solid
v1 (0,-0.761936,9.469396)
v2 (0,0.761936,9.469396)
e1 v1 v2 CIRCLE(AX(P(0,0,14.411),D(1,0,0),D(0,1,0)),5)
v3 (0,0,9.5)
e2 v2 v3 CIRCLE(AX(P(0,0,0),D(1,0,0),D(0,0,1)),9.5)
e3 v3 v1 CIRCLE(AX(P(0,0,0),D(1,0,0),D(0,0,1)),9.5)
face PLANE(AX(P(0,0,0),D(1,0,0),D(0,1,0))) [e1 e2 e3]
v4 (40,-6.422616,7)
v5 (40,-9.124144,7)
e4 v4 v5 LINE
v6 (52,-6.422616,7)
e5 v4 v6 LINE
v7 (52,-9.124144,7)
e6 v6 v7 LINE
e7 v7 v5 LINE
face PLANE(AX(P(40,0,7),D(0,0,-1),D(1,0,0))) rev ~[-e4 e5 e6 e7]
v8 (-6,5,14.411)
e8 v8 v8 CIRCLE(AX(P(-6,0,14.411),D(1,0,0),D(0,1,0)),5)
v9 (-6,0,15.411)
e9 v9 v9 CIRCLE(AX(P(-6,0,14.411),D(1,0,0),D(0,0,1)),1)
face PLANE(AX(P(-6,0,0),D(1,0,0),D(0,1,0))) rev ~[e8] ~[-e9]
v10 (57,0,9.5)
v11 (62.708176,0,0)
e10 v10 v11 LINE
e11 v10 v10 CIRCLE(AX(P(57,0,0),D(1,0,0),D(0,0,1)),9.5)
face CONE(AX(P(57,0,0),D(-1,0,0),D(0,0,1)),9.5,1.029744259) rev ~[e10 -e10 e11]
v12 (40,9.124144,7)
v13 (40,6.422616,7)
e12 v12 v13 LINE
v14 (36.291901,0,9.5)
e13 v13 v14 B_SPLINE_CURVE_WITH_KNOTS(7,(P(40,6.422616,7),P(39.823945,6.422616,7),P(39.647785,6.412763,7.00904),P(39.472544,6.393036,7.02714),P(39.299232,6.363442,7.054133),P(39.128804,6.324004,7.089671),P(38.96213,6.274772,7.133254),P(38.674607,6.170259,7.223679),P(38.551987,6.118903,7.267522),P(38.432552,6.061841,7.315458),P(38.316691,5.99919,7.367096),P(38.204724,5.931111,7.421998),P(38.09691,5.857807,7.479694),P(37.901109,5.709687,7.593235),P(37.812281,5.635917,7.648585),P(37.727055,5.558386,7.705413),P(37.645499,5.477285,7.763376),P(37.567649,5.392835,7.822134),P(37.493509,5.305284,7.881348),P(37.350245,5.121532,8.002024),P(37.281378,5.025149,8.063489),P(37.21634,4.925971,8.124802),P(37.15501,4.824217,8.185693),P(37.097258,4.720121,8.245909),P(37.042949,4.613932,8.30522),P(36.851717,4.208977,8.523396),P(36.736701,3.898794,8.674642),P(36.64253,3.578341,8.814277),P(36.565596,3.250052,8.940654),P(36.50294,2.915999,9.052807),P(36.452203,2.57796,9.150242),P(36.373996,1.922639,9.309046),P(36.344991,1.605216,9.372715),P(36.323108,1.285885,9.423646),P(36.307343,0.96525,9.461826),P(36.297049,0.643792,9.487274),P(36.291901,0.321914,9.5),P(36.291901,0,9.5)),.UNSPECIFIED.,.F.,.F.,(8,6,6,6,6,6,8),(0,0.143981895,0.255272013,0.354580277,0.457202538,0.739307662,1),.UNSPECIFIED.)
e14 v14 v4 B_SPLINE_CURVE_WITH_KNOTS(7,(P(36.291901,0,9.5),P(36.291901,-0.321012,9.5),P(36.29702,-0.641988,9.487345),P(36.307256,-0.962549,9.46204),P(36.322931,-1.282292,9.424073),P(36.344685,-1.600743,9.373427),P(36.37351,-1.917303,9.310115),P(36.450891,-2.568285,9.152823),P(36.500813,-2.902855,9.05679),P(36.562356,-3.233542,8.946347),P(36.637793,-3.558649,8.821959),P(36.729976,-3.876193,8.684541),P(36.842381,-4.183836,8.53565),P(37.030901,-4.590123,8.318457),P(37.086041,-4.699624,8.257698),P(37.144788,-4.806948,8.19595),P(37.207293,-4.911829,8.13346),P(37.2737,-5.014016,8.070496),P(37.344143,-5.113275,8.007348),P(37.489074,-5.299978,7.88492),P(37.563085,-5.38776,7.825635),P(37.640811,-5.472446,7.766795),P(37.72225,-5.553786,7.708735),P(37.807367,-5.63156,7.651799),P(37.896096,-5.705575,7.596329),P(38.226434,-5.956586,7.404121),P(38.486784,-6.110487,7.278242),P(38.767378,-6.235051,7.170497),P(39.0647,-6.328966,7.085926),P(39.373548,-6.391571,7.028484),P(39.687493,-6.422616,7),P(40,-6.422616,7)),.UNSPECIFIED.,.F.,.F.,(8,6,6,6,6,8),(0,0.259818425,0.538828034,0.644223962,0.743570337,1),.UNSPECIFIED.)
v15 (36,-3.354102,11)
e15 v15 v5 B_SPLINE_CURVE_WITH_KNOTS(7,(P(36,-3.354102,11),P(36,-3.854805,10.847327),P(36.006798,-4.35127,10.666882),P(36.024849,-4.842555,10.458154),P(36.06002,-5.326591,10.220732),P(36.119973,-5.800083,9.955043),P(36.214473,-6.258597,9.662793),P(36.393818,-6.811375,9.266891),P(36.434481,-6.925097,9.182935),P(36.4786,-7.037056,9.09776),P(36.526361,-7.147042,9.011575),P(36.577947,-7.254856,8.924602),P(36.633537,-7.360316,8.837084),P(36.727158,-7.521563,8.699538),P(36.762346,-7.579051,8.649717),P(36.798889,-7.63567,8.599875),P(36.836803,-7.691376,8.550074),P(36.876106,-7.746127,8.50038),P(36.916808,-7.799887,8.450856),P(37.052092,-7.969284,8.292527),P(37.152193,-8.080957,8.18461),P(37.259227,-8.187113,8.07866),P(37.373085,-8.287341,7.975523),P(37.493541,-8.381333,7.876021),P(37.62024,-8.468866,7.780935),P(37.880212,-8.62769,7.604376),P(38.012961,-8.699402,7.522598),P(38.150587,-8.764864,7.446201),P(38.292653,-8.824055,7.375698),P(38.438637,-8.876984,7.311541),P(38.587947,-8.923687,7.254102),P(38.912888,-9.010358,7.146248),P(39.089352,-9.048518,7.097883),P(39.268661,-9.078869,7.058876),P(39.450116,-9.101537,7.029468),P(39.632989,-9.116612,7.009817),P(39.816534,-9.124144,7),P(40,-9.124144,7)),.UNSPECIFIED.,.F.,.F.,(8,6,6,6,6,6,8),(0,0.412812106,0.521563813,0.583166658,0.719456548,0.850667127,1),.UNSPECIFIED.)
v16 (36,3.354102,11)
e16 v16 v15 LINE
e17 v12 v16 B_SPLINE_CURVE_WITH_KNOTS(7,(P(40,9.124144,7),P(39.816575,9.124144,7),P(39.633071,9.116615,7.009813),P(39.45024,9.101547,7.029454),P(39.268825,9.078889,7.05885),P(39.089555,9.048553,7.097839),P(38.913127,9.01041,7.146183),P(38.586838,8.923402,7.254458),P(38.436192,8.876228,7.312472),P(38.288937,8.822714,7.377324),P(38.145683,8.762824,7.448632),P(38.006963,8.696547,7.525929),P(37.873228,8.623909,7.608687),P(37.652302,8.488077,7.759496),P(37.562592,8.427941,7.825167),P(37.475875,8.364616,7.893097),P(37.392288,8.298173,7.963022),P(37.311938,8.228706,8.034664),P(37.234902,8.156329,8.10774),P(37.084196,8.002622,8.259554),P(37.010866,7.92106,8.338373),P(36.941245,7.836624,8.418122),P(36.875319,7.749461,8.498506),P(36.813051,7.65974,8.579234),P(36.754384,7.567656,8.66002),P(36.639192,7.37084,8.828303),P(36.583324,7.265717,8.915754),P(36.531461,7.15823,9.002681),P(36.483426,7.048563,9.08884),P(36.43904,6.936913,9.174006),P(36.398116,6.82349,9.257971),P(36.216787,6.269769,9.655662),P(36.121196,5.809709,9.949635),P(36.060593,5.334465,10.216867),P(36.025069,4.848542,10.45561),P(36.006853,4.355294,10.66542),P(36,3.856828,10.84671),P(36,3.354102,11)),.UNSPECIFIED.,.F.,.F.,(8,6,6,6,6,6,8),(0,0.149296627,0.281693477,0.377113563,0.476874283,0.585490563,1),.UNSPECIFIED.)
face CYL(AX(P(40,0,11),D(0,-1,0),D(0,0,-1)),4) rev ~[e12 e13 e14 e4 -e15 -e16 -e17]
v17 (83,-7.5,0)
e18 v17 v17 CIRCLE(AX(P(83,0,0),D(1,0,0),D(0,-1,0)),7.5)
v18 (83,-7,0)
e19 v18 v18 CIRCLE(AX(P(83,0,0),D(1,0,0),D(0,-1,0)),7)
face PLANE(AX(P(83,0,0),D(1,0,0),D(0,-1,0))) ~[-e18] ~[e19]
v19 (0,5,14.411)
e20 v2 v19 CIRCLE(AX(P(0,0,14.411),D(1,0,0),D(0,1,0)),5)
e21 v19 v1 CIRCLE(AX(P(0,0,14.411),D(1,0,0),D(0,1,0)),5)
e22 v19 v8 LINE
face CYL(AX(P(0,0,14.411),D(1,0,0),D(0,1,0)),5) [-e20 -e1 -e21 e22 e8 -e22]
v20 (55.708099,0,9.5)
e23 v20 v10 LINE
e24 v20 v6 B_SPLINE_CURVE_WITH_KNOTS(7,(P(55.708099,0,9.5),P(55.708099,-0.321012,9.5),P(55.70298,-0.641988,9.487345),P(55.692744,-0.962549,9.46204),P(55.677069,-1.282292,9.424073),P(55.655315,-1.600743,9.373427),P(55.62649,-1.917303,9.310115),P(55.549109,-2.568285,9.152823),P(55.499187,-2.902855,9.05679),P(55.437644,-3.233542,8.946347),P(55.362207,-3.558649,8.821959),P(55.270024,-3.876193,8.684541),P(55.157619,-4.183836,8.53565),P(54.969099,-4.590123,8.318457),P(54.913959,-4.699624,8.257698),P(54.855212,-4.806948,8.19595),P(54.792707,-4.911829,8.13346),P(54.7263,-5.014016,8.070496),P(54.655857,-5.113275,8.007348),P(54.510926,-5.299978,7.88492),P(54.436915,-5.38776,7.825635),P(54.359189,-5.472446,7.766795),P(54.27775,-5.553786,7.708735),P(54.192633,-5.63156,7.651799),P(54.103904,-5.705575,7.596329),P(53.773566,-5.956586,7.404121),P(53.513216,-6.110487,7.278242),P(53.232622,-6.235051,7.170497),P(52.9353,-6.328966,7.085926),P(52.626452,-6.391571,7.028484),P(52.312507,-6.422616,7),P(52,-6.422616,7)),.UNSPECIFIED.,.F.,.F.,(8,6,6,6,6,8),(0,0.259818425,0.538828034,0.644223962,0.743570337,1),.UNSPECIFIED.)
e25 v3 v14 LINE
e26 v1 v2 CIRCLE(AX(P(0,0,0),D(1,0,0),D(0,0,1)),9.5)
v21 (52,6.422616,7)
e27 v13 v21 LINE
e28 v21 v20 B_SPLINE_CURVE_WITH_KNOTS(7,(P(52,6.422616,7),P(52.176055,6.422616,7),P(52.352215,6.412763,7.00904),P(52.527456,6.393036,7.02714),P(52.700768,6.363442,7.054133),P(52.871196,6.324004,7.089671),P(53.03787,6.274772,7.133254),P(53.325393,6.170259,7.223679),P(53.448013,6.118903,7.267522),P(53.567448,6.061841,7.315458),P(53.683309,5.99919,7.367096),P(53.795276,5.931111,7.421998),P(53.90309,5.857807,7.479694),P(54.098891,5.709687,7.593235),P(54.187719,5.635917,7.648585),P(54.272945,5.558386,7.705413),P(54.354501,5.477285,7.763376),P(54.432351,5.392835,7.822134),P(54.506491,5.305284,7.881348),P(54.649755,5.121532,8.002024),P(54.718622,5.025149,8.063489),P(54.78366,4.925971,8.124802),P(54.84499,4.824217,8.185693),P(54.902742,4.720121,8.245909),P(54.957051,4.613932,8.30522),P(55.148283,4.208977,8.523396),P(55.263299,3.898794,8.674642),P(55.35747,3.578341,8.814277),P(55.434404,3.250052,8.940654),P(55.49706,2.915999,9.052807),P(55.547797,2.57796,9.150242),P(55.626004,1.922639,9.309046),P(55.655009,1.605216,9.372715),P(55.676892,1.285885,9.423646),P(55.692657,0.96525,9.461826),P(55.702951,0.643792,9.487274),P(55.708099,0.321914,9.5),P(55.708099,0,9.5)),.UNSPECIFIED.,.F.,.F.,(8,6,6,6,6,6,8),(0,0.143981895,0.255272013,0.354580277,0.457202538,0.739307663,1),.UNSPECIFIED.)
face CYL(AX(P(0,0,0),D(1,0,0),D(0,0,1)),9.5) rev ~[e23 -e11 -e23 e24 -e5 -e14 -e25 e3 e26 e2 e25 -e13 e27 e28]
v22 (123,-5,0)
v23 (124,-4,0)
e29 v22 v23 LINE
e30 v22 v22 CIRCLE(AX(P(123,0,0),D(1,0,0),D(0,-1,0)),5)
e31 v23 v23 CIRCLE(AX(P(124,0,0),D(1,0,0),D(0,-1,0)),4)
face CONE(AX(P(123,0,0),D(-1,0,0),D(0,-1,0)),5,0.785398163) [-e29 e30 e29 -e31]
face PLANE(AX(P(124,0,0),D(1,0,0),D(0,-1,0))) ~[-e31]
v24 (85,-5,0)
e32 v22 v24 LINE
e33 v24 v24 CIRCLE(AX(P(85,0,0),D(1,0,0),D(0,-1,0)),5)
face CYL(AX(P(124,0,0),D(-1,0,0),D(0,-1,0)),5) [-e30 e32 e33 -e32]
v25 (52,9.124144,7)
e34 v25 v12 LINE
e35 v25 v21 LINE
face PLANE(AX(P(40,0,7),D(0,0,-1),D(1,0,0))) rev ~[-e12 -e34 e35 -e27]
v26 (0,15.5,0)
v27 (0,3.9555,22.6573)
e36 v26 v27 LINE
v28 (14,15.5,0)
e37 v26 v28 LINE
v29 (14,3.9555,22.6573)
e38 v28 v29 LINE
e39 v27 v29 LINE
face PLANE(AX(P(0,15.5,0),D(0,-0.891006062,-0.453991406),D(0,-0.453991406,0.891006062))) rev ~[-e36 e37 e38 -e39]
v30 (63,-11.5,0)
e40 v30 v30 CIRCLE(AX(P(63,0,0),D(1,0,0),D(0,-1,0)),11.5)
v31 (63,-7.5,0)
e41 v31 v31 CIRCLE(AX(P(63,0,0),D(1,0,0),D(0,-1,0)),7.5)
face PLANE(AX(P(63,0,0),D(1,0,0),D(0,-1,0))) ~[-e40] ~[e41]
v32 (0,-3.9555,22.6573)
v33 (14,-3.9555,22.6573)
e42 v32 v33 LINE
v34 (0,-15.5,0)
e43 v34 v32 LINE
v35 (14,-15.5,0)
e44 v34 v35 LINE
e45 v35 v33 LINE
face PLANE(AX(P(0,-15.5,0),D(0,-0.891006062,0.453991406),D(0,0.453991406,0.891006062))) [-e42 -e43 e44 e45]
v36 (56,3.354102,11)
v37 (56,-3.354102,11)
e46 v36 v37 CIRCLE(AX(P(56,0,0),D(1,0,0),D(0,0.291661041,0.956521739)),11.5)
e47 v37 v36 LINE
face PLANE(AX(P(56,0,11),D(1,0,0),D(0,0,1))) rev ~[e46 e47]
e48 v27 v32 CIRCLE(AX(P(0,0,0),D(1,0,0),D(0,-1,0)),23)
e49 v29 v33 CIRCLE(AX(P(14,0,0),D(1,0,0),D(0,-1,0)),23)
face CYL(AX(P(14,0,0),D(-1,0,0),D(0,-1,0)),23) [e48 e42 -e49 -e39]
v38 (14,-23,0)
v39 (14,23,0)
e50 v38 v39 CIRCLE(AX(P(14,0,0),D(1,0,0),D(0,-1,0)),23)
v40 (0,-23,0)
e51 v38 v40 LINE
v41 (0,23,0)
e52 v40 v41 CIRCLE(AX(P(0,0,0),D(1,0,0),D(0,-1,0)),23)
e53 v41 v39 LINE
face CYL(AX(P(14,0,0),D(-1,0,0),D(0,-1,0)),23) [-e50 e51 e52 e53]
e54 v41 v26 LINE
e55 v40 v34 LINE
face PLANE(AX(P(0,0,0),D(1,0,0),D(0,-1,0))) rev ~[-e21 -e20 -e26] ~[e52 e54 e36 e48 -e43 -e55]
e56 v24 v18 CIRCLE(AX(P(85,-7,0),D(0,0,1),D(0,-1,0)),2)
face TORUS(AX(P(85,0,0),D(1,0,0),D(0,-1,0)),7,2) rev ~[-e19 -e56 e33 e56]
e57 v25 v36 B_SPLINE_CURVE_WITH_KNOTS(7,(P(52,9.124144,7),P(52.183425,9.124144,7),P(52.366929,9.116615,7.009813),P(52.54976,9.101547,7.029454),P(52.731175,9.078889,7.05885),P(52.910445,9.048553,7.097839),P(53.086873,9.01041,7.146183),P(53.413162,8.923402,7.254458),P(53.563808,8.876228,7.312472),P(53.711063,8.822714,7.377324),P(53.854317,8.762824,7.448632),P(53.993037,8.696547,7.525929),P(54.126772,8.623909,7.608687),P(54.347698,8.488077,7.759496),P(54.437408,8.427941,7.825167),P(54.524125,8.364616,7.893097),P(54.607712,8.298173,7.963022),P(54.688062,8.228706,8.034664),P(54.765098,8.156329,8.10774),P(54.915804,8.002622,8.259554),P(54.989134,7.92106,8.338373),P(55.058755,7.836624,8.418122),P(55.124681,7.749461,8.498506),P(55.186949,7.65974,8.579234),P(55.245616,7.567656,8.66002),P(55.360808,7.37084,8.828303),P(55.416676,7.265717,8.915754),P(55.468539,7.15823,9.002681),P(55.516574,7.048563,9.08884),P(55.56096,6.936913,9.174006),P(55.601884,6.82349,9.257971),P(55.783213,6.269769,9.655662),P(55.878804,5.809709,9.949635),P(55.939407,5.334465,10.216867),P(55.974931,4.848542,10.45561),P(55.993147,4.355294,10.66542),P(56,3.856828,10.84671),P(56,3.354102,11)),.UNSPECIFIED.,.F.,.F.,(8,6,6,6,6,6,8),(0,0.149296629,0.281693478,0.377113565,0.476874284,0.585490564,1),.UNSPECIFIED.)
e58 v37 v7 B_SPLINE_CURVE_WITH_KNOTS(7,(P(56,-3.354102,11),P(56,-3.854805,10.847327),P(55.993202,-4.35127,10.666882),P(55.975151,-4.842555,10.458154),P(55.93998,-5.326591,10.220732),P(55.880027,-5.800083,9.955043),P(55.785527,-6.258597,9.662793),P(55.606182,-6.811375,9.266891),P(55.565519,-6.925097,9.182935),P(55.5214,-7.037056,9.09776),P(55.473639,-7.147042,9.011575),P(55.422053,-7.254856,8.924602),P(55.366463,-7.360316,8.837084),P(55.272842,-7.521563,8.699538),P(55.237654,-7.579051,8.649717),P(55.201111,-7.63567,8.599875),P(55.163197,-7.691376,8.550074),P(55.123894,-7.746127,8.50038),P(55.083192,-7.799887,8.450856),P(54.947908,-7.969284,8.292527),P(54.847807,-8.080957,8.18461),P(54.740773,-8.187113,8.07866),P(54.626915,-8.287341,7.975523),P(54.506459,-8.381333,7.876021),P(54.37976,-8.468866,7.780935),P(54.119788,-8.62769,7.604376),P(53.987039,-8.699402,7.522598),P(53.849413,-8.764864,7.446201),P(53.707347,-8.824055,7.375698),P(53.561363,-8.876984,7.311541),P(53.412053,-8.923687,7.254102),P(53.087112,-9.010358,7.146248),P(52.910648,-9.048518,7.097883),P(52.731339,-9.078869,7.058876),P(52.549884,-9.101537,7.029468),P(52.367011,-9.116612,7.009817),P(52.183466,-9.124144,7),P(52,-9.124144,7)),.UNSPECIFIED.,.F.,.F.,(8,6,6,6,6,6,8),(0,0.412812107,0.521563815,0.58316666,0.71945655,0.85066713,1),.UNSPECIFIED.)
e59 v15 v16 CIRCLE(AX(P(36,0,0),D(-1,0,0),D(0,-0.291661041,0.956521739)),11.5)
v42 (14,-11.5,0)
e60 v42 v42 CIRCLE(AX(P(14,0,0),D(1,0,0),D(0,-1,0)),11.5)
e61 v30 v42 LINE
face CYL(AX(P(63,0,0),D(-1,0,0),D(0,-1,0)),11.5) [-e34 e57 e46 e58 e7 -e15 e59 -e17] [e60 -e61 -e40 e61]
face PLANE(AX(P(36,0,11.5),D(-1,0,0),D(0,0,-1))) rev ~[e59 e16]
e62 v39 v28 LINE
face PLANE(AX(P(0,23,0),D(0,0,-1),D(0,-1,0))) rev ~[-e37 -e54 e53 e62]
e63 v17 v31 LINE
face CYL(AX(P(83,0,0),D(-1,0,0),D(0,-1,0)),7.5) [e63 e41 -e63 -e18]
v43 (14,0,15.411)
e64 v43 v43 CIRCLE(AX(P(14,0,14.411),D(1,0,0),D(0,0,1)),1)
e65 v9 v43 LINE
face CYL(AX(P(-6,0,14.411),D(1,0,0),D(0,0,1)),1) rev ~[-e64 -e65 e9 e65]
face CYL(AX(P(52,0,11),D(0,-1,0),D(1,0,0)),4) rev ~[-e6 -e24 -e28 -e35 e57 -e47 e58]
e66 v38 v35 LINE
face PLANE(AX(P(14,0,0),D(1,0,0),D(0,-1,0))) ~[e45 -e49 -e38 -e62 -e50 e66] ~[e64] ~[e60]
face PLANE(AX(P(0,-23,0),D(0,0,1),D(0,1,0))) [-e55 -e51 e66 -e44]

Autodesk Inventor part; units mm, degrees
ref_plane "YZ Plane" through (0, 0, 0) normal (1, 0, 0) x (0, 1, 0)
ref_plane "XZ Plane" through (0, 0, 0) normal (0, 1, 0) x (-1, 0, 0)
ref_plane "XY Plane" through (0, 0, 0) normal (0, 0, 1) x (1, 0, 0)
sketch "Szkic1" plane through (0, 0, 0) normal (0, 0, 1) x (1, 0, 0)
  line L0 (0, 0) -> (14, 0)
  line L1 (14, 0) -> (14, 23)
  line L2 (14, 23) -> (0, 23)
  line L3 (0, 23) -> (0, 0)
  line L4 (14, 0) -> (63, 0)
  line L5 (63, 0) -> (63, 11.5)
  line L6 (63, 11.5) -> (14, 11.5)
  line L7 (14, 11.5) -> (14, 0)
  line L8 (63, 0) -> (83, 0)
  line L9 (83, 0) -> (83, 7.5)
  line L10 (83, 7.5) -> (63, 7.5)
  line L11 (63, 7.5) -> (63, 0)
  line L12 (83, 0) -> (124, 0)
  line L13 (124, 0) -> (124, 5)
  line L14 (124, 5) -> (83, 5)
  line L15 (83, 5) -> (83, 0)
  point P0 (14, 11.5)
  dimension "d0" = 14
  dimension "d1" = 23
  dimension "d2" = 49
  dimension "d3" = 11.5
  dimension "d4" = 20
  dimension "d5" = 7.5
  dimension "d6" = 41
  dimension "d7" = 5
revolve "Obrót1" add sketch "Szkic1" angle 360 mid plane about axis through (14, 0, 0) along (1, 0, 0)
sketch "Szkic2" plane through (0, 0, 0) normal (-1, 0, 0) x (0, 0, 1)
  circle A0 centre (0, 0) radius 23 projected
hole "Otwór1" at (0, 0, 0) direction (1, 0, 0) diameter 19 depth 57 tip angle 118
chamfer "Faza1" distance 1 angle 45 1 edges at (124, 5, 0) measured on face at (124, 0.8193, 0.3214)
fillet "Zaokrąglenie powierzchni1" radius 2 1 edges at (83, 5, 0)
sketch "Szkic3" plane through (0, 0, 0) normal (1, 0, 0) x (0, 1, 0)
  circle A0 centre (0, 0) radius 23 projected
  line L0 (23, 0) -> (15.5, 0)
  line L1 (15.5, 0) -> (3.9555, 22.6573)
  line L2 (-23, 0) -> (-15.5, 0)
  line L3 (-15.5, 0) -> (-3.9555, 22.6573)
  line L4 (-15.5, 0) -> (9.9289, 0) construction
  dimension "d20" = 7.5
  dimension "d21" = 117
  dimension "d22" = 7.5
  dimension "d23" = 63
extrude "Wyciągnięcie proste1" cut sketch "Szkic3" along normal blind 14 contours L0 L1 A0 | A0 L3 L2
sketch "Szkic4" plane through (0, 0, 0) normal (1, 0, 0) x (0, 1, 0)
  circle A0 centre (0, 14.411) radius 5
  point P0 (0, 0)
  dimension "d26" = 10
extrude "Wyciągnięcie proste2" add sketch "Szkic4" against normal blind 6
sketch "Szkic5" plane through (-6, 0, 14.411) normal (-1, 0, 0) x (0, 0, 1)
  point P0 (-14.411, 0)
  point P1 (0, 0)
hole "Otwór2" at (-6, 0, 14.411) direction (1, 0, 0) diameter 2 end through all
sketch "Szkic6" plane through (0, 0, 0) normal (0, 1, 0) x (-1, 0, 0)
  line L0 (-14, 11.5) -> (-63, 11.5) projected
  line L1 (-40, 7) -> (-52, 7)
  line L2 (-56, 11) -> (-56, 11.5)
  line L3 (-56, 11.5) -> (-36, 11.5)
  line L4 (-36, 11.5) -> (-36, 11)
  line L5 (0, 0) -> (0, 22.6573) projected
  arc A0 (-40, 7) -> (-36, 11) centre (-40, 11) ccw
  arc A1 (-56, 11) -> (-52, 7) centre (-52, 11) ccw
  dimension "d36" = 20
  dimension "d37" = 36
  dimension "d38" = 4.5
  dimension "d39" = 4
  dimension "d40" = 4
extrude "Wyciągnięcie proste3" cut sketch "Szkic6" along normal through all both and the other way through all
